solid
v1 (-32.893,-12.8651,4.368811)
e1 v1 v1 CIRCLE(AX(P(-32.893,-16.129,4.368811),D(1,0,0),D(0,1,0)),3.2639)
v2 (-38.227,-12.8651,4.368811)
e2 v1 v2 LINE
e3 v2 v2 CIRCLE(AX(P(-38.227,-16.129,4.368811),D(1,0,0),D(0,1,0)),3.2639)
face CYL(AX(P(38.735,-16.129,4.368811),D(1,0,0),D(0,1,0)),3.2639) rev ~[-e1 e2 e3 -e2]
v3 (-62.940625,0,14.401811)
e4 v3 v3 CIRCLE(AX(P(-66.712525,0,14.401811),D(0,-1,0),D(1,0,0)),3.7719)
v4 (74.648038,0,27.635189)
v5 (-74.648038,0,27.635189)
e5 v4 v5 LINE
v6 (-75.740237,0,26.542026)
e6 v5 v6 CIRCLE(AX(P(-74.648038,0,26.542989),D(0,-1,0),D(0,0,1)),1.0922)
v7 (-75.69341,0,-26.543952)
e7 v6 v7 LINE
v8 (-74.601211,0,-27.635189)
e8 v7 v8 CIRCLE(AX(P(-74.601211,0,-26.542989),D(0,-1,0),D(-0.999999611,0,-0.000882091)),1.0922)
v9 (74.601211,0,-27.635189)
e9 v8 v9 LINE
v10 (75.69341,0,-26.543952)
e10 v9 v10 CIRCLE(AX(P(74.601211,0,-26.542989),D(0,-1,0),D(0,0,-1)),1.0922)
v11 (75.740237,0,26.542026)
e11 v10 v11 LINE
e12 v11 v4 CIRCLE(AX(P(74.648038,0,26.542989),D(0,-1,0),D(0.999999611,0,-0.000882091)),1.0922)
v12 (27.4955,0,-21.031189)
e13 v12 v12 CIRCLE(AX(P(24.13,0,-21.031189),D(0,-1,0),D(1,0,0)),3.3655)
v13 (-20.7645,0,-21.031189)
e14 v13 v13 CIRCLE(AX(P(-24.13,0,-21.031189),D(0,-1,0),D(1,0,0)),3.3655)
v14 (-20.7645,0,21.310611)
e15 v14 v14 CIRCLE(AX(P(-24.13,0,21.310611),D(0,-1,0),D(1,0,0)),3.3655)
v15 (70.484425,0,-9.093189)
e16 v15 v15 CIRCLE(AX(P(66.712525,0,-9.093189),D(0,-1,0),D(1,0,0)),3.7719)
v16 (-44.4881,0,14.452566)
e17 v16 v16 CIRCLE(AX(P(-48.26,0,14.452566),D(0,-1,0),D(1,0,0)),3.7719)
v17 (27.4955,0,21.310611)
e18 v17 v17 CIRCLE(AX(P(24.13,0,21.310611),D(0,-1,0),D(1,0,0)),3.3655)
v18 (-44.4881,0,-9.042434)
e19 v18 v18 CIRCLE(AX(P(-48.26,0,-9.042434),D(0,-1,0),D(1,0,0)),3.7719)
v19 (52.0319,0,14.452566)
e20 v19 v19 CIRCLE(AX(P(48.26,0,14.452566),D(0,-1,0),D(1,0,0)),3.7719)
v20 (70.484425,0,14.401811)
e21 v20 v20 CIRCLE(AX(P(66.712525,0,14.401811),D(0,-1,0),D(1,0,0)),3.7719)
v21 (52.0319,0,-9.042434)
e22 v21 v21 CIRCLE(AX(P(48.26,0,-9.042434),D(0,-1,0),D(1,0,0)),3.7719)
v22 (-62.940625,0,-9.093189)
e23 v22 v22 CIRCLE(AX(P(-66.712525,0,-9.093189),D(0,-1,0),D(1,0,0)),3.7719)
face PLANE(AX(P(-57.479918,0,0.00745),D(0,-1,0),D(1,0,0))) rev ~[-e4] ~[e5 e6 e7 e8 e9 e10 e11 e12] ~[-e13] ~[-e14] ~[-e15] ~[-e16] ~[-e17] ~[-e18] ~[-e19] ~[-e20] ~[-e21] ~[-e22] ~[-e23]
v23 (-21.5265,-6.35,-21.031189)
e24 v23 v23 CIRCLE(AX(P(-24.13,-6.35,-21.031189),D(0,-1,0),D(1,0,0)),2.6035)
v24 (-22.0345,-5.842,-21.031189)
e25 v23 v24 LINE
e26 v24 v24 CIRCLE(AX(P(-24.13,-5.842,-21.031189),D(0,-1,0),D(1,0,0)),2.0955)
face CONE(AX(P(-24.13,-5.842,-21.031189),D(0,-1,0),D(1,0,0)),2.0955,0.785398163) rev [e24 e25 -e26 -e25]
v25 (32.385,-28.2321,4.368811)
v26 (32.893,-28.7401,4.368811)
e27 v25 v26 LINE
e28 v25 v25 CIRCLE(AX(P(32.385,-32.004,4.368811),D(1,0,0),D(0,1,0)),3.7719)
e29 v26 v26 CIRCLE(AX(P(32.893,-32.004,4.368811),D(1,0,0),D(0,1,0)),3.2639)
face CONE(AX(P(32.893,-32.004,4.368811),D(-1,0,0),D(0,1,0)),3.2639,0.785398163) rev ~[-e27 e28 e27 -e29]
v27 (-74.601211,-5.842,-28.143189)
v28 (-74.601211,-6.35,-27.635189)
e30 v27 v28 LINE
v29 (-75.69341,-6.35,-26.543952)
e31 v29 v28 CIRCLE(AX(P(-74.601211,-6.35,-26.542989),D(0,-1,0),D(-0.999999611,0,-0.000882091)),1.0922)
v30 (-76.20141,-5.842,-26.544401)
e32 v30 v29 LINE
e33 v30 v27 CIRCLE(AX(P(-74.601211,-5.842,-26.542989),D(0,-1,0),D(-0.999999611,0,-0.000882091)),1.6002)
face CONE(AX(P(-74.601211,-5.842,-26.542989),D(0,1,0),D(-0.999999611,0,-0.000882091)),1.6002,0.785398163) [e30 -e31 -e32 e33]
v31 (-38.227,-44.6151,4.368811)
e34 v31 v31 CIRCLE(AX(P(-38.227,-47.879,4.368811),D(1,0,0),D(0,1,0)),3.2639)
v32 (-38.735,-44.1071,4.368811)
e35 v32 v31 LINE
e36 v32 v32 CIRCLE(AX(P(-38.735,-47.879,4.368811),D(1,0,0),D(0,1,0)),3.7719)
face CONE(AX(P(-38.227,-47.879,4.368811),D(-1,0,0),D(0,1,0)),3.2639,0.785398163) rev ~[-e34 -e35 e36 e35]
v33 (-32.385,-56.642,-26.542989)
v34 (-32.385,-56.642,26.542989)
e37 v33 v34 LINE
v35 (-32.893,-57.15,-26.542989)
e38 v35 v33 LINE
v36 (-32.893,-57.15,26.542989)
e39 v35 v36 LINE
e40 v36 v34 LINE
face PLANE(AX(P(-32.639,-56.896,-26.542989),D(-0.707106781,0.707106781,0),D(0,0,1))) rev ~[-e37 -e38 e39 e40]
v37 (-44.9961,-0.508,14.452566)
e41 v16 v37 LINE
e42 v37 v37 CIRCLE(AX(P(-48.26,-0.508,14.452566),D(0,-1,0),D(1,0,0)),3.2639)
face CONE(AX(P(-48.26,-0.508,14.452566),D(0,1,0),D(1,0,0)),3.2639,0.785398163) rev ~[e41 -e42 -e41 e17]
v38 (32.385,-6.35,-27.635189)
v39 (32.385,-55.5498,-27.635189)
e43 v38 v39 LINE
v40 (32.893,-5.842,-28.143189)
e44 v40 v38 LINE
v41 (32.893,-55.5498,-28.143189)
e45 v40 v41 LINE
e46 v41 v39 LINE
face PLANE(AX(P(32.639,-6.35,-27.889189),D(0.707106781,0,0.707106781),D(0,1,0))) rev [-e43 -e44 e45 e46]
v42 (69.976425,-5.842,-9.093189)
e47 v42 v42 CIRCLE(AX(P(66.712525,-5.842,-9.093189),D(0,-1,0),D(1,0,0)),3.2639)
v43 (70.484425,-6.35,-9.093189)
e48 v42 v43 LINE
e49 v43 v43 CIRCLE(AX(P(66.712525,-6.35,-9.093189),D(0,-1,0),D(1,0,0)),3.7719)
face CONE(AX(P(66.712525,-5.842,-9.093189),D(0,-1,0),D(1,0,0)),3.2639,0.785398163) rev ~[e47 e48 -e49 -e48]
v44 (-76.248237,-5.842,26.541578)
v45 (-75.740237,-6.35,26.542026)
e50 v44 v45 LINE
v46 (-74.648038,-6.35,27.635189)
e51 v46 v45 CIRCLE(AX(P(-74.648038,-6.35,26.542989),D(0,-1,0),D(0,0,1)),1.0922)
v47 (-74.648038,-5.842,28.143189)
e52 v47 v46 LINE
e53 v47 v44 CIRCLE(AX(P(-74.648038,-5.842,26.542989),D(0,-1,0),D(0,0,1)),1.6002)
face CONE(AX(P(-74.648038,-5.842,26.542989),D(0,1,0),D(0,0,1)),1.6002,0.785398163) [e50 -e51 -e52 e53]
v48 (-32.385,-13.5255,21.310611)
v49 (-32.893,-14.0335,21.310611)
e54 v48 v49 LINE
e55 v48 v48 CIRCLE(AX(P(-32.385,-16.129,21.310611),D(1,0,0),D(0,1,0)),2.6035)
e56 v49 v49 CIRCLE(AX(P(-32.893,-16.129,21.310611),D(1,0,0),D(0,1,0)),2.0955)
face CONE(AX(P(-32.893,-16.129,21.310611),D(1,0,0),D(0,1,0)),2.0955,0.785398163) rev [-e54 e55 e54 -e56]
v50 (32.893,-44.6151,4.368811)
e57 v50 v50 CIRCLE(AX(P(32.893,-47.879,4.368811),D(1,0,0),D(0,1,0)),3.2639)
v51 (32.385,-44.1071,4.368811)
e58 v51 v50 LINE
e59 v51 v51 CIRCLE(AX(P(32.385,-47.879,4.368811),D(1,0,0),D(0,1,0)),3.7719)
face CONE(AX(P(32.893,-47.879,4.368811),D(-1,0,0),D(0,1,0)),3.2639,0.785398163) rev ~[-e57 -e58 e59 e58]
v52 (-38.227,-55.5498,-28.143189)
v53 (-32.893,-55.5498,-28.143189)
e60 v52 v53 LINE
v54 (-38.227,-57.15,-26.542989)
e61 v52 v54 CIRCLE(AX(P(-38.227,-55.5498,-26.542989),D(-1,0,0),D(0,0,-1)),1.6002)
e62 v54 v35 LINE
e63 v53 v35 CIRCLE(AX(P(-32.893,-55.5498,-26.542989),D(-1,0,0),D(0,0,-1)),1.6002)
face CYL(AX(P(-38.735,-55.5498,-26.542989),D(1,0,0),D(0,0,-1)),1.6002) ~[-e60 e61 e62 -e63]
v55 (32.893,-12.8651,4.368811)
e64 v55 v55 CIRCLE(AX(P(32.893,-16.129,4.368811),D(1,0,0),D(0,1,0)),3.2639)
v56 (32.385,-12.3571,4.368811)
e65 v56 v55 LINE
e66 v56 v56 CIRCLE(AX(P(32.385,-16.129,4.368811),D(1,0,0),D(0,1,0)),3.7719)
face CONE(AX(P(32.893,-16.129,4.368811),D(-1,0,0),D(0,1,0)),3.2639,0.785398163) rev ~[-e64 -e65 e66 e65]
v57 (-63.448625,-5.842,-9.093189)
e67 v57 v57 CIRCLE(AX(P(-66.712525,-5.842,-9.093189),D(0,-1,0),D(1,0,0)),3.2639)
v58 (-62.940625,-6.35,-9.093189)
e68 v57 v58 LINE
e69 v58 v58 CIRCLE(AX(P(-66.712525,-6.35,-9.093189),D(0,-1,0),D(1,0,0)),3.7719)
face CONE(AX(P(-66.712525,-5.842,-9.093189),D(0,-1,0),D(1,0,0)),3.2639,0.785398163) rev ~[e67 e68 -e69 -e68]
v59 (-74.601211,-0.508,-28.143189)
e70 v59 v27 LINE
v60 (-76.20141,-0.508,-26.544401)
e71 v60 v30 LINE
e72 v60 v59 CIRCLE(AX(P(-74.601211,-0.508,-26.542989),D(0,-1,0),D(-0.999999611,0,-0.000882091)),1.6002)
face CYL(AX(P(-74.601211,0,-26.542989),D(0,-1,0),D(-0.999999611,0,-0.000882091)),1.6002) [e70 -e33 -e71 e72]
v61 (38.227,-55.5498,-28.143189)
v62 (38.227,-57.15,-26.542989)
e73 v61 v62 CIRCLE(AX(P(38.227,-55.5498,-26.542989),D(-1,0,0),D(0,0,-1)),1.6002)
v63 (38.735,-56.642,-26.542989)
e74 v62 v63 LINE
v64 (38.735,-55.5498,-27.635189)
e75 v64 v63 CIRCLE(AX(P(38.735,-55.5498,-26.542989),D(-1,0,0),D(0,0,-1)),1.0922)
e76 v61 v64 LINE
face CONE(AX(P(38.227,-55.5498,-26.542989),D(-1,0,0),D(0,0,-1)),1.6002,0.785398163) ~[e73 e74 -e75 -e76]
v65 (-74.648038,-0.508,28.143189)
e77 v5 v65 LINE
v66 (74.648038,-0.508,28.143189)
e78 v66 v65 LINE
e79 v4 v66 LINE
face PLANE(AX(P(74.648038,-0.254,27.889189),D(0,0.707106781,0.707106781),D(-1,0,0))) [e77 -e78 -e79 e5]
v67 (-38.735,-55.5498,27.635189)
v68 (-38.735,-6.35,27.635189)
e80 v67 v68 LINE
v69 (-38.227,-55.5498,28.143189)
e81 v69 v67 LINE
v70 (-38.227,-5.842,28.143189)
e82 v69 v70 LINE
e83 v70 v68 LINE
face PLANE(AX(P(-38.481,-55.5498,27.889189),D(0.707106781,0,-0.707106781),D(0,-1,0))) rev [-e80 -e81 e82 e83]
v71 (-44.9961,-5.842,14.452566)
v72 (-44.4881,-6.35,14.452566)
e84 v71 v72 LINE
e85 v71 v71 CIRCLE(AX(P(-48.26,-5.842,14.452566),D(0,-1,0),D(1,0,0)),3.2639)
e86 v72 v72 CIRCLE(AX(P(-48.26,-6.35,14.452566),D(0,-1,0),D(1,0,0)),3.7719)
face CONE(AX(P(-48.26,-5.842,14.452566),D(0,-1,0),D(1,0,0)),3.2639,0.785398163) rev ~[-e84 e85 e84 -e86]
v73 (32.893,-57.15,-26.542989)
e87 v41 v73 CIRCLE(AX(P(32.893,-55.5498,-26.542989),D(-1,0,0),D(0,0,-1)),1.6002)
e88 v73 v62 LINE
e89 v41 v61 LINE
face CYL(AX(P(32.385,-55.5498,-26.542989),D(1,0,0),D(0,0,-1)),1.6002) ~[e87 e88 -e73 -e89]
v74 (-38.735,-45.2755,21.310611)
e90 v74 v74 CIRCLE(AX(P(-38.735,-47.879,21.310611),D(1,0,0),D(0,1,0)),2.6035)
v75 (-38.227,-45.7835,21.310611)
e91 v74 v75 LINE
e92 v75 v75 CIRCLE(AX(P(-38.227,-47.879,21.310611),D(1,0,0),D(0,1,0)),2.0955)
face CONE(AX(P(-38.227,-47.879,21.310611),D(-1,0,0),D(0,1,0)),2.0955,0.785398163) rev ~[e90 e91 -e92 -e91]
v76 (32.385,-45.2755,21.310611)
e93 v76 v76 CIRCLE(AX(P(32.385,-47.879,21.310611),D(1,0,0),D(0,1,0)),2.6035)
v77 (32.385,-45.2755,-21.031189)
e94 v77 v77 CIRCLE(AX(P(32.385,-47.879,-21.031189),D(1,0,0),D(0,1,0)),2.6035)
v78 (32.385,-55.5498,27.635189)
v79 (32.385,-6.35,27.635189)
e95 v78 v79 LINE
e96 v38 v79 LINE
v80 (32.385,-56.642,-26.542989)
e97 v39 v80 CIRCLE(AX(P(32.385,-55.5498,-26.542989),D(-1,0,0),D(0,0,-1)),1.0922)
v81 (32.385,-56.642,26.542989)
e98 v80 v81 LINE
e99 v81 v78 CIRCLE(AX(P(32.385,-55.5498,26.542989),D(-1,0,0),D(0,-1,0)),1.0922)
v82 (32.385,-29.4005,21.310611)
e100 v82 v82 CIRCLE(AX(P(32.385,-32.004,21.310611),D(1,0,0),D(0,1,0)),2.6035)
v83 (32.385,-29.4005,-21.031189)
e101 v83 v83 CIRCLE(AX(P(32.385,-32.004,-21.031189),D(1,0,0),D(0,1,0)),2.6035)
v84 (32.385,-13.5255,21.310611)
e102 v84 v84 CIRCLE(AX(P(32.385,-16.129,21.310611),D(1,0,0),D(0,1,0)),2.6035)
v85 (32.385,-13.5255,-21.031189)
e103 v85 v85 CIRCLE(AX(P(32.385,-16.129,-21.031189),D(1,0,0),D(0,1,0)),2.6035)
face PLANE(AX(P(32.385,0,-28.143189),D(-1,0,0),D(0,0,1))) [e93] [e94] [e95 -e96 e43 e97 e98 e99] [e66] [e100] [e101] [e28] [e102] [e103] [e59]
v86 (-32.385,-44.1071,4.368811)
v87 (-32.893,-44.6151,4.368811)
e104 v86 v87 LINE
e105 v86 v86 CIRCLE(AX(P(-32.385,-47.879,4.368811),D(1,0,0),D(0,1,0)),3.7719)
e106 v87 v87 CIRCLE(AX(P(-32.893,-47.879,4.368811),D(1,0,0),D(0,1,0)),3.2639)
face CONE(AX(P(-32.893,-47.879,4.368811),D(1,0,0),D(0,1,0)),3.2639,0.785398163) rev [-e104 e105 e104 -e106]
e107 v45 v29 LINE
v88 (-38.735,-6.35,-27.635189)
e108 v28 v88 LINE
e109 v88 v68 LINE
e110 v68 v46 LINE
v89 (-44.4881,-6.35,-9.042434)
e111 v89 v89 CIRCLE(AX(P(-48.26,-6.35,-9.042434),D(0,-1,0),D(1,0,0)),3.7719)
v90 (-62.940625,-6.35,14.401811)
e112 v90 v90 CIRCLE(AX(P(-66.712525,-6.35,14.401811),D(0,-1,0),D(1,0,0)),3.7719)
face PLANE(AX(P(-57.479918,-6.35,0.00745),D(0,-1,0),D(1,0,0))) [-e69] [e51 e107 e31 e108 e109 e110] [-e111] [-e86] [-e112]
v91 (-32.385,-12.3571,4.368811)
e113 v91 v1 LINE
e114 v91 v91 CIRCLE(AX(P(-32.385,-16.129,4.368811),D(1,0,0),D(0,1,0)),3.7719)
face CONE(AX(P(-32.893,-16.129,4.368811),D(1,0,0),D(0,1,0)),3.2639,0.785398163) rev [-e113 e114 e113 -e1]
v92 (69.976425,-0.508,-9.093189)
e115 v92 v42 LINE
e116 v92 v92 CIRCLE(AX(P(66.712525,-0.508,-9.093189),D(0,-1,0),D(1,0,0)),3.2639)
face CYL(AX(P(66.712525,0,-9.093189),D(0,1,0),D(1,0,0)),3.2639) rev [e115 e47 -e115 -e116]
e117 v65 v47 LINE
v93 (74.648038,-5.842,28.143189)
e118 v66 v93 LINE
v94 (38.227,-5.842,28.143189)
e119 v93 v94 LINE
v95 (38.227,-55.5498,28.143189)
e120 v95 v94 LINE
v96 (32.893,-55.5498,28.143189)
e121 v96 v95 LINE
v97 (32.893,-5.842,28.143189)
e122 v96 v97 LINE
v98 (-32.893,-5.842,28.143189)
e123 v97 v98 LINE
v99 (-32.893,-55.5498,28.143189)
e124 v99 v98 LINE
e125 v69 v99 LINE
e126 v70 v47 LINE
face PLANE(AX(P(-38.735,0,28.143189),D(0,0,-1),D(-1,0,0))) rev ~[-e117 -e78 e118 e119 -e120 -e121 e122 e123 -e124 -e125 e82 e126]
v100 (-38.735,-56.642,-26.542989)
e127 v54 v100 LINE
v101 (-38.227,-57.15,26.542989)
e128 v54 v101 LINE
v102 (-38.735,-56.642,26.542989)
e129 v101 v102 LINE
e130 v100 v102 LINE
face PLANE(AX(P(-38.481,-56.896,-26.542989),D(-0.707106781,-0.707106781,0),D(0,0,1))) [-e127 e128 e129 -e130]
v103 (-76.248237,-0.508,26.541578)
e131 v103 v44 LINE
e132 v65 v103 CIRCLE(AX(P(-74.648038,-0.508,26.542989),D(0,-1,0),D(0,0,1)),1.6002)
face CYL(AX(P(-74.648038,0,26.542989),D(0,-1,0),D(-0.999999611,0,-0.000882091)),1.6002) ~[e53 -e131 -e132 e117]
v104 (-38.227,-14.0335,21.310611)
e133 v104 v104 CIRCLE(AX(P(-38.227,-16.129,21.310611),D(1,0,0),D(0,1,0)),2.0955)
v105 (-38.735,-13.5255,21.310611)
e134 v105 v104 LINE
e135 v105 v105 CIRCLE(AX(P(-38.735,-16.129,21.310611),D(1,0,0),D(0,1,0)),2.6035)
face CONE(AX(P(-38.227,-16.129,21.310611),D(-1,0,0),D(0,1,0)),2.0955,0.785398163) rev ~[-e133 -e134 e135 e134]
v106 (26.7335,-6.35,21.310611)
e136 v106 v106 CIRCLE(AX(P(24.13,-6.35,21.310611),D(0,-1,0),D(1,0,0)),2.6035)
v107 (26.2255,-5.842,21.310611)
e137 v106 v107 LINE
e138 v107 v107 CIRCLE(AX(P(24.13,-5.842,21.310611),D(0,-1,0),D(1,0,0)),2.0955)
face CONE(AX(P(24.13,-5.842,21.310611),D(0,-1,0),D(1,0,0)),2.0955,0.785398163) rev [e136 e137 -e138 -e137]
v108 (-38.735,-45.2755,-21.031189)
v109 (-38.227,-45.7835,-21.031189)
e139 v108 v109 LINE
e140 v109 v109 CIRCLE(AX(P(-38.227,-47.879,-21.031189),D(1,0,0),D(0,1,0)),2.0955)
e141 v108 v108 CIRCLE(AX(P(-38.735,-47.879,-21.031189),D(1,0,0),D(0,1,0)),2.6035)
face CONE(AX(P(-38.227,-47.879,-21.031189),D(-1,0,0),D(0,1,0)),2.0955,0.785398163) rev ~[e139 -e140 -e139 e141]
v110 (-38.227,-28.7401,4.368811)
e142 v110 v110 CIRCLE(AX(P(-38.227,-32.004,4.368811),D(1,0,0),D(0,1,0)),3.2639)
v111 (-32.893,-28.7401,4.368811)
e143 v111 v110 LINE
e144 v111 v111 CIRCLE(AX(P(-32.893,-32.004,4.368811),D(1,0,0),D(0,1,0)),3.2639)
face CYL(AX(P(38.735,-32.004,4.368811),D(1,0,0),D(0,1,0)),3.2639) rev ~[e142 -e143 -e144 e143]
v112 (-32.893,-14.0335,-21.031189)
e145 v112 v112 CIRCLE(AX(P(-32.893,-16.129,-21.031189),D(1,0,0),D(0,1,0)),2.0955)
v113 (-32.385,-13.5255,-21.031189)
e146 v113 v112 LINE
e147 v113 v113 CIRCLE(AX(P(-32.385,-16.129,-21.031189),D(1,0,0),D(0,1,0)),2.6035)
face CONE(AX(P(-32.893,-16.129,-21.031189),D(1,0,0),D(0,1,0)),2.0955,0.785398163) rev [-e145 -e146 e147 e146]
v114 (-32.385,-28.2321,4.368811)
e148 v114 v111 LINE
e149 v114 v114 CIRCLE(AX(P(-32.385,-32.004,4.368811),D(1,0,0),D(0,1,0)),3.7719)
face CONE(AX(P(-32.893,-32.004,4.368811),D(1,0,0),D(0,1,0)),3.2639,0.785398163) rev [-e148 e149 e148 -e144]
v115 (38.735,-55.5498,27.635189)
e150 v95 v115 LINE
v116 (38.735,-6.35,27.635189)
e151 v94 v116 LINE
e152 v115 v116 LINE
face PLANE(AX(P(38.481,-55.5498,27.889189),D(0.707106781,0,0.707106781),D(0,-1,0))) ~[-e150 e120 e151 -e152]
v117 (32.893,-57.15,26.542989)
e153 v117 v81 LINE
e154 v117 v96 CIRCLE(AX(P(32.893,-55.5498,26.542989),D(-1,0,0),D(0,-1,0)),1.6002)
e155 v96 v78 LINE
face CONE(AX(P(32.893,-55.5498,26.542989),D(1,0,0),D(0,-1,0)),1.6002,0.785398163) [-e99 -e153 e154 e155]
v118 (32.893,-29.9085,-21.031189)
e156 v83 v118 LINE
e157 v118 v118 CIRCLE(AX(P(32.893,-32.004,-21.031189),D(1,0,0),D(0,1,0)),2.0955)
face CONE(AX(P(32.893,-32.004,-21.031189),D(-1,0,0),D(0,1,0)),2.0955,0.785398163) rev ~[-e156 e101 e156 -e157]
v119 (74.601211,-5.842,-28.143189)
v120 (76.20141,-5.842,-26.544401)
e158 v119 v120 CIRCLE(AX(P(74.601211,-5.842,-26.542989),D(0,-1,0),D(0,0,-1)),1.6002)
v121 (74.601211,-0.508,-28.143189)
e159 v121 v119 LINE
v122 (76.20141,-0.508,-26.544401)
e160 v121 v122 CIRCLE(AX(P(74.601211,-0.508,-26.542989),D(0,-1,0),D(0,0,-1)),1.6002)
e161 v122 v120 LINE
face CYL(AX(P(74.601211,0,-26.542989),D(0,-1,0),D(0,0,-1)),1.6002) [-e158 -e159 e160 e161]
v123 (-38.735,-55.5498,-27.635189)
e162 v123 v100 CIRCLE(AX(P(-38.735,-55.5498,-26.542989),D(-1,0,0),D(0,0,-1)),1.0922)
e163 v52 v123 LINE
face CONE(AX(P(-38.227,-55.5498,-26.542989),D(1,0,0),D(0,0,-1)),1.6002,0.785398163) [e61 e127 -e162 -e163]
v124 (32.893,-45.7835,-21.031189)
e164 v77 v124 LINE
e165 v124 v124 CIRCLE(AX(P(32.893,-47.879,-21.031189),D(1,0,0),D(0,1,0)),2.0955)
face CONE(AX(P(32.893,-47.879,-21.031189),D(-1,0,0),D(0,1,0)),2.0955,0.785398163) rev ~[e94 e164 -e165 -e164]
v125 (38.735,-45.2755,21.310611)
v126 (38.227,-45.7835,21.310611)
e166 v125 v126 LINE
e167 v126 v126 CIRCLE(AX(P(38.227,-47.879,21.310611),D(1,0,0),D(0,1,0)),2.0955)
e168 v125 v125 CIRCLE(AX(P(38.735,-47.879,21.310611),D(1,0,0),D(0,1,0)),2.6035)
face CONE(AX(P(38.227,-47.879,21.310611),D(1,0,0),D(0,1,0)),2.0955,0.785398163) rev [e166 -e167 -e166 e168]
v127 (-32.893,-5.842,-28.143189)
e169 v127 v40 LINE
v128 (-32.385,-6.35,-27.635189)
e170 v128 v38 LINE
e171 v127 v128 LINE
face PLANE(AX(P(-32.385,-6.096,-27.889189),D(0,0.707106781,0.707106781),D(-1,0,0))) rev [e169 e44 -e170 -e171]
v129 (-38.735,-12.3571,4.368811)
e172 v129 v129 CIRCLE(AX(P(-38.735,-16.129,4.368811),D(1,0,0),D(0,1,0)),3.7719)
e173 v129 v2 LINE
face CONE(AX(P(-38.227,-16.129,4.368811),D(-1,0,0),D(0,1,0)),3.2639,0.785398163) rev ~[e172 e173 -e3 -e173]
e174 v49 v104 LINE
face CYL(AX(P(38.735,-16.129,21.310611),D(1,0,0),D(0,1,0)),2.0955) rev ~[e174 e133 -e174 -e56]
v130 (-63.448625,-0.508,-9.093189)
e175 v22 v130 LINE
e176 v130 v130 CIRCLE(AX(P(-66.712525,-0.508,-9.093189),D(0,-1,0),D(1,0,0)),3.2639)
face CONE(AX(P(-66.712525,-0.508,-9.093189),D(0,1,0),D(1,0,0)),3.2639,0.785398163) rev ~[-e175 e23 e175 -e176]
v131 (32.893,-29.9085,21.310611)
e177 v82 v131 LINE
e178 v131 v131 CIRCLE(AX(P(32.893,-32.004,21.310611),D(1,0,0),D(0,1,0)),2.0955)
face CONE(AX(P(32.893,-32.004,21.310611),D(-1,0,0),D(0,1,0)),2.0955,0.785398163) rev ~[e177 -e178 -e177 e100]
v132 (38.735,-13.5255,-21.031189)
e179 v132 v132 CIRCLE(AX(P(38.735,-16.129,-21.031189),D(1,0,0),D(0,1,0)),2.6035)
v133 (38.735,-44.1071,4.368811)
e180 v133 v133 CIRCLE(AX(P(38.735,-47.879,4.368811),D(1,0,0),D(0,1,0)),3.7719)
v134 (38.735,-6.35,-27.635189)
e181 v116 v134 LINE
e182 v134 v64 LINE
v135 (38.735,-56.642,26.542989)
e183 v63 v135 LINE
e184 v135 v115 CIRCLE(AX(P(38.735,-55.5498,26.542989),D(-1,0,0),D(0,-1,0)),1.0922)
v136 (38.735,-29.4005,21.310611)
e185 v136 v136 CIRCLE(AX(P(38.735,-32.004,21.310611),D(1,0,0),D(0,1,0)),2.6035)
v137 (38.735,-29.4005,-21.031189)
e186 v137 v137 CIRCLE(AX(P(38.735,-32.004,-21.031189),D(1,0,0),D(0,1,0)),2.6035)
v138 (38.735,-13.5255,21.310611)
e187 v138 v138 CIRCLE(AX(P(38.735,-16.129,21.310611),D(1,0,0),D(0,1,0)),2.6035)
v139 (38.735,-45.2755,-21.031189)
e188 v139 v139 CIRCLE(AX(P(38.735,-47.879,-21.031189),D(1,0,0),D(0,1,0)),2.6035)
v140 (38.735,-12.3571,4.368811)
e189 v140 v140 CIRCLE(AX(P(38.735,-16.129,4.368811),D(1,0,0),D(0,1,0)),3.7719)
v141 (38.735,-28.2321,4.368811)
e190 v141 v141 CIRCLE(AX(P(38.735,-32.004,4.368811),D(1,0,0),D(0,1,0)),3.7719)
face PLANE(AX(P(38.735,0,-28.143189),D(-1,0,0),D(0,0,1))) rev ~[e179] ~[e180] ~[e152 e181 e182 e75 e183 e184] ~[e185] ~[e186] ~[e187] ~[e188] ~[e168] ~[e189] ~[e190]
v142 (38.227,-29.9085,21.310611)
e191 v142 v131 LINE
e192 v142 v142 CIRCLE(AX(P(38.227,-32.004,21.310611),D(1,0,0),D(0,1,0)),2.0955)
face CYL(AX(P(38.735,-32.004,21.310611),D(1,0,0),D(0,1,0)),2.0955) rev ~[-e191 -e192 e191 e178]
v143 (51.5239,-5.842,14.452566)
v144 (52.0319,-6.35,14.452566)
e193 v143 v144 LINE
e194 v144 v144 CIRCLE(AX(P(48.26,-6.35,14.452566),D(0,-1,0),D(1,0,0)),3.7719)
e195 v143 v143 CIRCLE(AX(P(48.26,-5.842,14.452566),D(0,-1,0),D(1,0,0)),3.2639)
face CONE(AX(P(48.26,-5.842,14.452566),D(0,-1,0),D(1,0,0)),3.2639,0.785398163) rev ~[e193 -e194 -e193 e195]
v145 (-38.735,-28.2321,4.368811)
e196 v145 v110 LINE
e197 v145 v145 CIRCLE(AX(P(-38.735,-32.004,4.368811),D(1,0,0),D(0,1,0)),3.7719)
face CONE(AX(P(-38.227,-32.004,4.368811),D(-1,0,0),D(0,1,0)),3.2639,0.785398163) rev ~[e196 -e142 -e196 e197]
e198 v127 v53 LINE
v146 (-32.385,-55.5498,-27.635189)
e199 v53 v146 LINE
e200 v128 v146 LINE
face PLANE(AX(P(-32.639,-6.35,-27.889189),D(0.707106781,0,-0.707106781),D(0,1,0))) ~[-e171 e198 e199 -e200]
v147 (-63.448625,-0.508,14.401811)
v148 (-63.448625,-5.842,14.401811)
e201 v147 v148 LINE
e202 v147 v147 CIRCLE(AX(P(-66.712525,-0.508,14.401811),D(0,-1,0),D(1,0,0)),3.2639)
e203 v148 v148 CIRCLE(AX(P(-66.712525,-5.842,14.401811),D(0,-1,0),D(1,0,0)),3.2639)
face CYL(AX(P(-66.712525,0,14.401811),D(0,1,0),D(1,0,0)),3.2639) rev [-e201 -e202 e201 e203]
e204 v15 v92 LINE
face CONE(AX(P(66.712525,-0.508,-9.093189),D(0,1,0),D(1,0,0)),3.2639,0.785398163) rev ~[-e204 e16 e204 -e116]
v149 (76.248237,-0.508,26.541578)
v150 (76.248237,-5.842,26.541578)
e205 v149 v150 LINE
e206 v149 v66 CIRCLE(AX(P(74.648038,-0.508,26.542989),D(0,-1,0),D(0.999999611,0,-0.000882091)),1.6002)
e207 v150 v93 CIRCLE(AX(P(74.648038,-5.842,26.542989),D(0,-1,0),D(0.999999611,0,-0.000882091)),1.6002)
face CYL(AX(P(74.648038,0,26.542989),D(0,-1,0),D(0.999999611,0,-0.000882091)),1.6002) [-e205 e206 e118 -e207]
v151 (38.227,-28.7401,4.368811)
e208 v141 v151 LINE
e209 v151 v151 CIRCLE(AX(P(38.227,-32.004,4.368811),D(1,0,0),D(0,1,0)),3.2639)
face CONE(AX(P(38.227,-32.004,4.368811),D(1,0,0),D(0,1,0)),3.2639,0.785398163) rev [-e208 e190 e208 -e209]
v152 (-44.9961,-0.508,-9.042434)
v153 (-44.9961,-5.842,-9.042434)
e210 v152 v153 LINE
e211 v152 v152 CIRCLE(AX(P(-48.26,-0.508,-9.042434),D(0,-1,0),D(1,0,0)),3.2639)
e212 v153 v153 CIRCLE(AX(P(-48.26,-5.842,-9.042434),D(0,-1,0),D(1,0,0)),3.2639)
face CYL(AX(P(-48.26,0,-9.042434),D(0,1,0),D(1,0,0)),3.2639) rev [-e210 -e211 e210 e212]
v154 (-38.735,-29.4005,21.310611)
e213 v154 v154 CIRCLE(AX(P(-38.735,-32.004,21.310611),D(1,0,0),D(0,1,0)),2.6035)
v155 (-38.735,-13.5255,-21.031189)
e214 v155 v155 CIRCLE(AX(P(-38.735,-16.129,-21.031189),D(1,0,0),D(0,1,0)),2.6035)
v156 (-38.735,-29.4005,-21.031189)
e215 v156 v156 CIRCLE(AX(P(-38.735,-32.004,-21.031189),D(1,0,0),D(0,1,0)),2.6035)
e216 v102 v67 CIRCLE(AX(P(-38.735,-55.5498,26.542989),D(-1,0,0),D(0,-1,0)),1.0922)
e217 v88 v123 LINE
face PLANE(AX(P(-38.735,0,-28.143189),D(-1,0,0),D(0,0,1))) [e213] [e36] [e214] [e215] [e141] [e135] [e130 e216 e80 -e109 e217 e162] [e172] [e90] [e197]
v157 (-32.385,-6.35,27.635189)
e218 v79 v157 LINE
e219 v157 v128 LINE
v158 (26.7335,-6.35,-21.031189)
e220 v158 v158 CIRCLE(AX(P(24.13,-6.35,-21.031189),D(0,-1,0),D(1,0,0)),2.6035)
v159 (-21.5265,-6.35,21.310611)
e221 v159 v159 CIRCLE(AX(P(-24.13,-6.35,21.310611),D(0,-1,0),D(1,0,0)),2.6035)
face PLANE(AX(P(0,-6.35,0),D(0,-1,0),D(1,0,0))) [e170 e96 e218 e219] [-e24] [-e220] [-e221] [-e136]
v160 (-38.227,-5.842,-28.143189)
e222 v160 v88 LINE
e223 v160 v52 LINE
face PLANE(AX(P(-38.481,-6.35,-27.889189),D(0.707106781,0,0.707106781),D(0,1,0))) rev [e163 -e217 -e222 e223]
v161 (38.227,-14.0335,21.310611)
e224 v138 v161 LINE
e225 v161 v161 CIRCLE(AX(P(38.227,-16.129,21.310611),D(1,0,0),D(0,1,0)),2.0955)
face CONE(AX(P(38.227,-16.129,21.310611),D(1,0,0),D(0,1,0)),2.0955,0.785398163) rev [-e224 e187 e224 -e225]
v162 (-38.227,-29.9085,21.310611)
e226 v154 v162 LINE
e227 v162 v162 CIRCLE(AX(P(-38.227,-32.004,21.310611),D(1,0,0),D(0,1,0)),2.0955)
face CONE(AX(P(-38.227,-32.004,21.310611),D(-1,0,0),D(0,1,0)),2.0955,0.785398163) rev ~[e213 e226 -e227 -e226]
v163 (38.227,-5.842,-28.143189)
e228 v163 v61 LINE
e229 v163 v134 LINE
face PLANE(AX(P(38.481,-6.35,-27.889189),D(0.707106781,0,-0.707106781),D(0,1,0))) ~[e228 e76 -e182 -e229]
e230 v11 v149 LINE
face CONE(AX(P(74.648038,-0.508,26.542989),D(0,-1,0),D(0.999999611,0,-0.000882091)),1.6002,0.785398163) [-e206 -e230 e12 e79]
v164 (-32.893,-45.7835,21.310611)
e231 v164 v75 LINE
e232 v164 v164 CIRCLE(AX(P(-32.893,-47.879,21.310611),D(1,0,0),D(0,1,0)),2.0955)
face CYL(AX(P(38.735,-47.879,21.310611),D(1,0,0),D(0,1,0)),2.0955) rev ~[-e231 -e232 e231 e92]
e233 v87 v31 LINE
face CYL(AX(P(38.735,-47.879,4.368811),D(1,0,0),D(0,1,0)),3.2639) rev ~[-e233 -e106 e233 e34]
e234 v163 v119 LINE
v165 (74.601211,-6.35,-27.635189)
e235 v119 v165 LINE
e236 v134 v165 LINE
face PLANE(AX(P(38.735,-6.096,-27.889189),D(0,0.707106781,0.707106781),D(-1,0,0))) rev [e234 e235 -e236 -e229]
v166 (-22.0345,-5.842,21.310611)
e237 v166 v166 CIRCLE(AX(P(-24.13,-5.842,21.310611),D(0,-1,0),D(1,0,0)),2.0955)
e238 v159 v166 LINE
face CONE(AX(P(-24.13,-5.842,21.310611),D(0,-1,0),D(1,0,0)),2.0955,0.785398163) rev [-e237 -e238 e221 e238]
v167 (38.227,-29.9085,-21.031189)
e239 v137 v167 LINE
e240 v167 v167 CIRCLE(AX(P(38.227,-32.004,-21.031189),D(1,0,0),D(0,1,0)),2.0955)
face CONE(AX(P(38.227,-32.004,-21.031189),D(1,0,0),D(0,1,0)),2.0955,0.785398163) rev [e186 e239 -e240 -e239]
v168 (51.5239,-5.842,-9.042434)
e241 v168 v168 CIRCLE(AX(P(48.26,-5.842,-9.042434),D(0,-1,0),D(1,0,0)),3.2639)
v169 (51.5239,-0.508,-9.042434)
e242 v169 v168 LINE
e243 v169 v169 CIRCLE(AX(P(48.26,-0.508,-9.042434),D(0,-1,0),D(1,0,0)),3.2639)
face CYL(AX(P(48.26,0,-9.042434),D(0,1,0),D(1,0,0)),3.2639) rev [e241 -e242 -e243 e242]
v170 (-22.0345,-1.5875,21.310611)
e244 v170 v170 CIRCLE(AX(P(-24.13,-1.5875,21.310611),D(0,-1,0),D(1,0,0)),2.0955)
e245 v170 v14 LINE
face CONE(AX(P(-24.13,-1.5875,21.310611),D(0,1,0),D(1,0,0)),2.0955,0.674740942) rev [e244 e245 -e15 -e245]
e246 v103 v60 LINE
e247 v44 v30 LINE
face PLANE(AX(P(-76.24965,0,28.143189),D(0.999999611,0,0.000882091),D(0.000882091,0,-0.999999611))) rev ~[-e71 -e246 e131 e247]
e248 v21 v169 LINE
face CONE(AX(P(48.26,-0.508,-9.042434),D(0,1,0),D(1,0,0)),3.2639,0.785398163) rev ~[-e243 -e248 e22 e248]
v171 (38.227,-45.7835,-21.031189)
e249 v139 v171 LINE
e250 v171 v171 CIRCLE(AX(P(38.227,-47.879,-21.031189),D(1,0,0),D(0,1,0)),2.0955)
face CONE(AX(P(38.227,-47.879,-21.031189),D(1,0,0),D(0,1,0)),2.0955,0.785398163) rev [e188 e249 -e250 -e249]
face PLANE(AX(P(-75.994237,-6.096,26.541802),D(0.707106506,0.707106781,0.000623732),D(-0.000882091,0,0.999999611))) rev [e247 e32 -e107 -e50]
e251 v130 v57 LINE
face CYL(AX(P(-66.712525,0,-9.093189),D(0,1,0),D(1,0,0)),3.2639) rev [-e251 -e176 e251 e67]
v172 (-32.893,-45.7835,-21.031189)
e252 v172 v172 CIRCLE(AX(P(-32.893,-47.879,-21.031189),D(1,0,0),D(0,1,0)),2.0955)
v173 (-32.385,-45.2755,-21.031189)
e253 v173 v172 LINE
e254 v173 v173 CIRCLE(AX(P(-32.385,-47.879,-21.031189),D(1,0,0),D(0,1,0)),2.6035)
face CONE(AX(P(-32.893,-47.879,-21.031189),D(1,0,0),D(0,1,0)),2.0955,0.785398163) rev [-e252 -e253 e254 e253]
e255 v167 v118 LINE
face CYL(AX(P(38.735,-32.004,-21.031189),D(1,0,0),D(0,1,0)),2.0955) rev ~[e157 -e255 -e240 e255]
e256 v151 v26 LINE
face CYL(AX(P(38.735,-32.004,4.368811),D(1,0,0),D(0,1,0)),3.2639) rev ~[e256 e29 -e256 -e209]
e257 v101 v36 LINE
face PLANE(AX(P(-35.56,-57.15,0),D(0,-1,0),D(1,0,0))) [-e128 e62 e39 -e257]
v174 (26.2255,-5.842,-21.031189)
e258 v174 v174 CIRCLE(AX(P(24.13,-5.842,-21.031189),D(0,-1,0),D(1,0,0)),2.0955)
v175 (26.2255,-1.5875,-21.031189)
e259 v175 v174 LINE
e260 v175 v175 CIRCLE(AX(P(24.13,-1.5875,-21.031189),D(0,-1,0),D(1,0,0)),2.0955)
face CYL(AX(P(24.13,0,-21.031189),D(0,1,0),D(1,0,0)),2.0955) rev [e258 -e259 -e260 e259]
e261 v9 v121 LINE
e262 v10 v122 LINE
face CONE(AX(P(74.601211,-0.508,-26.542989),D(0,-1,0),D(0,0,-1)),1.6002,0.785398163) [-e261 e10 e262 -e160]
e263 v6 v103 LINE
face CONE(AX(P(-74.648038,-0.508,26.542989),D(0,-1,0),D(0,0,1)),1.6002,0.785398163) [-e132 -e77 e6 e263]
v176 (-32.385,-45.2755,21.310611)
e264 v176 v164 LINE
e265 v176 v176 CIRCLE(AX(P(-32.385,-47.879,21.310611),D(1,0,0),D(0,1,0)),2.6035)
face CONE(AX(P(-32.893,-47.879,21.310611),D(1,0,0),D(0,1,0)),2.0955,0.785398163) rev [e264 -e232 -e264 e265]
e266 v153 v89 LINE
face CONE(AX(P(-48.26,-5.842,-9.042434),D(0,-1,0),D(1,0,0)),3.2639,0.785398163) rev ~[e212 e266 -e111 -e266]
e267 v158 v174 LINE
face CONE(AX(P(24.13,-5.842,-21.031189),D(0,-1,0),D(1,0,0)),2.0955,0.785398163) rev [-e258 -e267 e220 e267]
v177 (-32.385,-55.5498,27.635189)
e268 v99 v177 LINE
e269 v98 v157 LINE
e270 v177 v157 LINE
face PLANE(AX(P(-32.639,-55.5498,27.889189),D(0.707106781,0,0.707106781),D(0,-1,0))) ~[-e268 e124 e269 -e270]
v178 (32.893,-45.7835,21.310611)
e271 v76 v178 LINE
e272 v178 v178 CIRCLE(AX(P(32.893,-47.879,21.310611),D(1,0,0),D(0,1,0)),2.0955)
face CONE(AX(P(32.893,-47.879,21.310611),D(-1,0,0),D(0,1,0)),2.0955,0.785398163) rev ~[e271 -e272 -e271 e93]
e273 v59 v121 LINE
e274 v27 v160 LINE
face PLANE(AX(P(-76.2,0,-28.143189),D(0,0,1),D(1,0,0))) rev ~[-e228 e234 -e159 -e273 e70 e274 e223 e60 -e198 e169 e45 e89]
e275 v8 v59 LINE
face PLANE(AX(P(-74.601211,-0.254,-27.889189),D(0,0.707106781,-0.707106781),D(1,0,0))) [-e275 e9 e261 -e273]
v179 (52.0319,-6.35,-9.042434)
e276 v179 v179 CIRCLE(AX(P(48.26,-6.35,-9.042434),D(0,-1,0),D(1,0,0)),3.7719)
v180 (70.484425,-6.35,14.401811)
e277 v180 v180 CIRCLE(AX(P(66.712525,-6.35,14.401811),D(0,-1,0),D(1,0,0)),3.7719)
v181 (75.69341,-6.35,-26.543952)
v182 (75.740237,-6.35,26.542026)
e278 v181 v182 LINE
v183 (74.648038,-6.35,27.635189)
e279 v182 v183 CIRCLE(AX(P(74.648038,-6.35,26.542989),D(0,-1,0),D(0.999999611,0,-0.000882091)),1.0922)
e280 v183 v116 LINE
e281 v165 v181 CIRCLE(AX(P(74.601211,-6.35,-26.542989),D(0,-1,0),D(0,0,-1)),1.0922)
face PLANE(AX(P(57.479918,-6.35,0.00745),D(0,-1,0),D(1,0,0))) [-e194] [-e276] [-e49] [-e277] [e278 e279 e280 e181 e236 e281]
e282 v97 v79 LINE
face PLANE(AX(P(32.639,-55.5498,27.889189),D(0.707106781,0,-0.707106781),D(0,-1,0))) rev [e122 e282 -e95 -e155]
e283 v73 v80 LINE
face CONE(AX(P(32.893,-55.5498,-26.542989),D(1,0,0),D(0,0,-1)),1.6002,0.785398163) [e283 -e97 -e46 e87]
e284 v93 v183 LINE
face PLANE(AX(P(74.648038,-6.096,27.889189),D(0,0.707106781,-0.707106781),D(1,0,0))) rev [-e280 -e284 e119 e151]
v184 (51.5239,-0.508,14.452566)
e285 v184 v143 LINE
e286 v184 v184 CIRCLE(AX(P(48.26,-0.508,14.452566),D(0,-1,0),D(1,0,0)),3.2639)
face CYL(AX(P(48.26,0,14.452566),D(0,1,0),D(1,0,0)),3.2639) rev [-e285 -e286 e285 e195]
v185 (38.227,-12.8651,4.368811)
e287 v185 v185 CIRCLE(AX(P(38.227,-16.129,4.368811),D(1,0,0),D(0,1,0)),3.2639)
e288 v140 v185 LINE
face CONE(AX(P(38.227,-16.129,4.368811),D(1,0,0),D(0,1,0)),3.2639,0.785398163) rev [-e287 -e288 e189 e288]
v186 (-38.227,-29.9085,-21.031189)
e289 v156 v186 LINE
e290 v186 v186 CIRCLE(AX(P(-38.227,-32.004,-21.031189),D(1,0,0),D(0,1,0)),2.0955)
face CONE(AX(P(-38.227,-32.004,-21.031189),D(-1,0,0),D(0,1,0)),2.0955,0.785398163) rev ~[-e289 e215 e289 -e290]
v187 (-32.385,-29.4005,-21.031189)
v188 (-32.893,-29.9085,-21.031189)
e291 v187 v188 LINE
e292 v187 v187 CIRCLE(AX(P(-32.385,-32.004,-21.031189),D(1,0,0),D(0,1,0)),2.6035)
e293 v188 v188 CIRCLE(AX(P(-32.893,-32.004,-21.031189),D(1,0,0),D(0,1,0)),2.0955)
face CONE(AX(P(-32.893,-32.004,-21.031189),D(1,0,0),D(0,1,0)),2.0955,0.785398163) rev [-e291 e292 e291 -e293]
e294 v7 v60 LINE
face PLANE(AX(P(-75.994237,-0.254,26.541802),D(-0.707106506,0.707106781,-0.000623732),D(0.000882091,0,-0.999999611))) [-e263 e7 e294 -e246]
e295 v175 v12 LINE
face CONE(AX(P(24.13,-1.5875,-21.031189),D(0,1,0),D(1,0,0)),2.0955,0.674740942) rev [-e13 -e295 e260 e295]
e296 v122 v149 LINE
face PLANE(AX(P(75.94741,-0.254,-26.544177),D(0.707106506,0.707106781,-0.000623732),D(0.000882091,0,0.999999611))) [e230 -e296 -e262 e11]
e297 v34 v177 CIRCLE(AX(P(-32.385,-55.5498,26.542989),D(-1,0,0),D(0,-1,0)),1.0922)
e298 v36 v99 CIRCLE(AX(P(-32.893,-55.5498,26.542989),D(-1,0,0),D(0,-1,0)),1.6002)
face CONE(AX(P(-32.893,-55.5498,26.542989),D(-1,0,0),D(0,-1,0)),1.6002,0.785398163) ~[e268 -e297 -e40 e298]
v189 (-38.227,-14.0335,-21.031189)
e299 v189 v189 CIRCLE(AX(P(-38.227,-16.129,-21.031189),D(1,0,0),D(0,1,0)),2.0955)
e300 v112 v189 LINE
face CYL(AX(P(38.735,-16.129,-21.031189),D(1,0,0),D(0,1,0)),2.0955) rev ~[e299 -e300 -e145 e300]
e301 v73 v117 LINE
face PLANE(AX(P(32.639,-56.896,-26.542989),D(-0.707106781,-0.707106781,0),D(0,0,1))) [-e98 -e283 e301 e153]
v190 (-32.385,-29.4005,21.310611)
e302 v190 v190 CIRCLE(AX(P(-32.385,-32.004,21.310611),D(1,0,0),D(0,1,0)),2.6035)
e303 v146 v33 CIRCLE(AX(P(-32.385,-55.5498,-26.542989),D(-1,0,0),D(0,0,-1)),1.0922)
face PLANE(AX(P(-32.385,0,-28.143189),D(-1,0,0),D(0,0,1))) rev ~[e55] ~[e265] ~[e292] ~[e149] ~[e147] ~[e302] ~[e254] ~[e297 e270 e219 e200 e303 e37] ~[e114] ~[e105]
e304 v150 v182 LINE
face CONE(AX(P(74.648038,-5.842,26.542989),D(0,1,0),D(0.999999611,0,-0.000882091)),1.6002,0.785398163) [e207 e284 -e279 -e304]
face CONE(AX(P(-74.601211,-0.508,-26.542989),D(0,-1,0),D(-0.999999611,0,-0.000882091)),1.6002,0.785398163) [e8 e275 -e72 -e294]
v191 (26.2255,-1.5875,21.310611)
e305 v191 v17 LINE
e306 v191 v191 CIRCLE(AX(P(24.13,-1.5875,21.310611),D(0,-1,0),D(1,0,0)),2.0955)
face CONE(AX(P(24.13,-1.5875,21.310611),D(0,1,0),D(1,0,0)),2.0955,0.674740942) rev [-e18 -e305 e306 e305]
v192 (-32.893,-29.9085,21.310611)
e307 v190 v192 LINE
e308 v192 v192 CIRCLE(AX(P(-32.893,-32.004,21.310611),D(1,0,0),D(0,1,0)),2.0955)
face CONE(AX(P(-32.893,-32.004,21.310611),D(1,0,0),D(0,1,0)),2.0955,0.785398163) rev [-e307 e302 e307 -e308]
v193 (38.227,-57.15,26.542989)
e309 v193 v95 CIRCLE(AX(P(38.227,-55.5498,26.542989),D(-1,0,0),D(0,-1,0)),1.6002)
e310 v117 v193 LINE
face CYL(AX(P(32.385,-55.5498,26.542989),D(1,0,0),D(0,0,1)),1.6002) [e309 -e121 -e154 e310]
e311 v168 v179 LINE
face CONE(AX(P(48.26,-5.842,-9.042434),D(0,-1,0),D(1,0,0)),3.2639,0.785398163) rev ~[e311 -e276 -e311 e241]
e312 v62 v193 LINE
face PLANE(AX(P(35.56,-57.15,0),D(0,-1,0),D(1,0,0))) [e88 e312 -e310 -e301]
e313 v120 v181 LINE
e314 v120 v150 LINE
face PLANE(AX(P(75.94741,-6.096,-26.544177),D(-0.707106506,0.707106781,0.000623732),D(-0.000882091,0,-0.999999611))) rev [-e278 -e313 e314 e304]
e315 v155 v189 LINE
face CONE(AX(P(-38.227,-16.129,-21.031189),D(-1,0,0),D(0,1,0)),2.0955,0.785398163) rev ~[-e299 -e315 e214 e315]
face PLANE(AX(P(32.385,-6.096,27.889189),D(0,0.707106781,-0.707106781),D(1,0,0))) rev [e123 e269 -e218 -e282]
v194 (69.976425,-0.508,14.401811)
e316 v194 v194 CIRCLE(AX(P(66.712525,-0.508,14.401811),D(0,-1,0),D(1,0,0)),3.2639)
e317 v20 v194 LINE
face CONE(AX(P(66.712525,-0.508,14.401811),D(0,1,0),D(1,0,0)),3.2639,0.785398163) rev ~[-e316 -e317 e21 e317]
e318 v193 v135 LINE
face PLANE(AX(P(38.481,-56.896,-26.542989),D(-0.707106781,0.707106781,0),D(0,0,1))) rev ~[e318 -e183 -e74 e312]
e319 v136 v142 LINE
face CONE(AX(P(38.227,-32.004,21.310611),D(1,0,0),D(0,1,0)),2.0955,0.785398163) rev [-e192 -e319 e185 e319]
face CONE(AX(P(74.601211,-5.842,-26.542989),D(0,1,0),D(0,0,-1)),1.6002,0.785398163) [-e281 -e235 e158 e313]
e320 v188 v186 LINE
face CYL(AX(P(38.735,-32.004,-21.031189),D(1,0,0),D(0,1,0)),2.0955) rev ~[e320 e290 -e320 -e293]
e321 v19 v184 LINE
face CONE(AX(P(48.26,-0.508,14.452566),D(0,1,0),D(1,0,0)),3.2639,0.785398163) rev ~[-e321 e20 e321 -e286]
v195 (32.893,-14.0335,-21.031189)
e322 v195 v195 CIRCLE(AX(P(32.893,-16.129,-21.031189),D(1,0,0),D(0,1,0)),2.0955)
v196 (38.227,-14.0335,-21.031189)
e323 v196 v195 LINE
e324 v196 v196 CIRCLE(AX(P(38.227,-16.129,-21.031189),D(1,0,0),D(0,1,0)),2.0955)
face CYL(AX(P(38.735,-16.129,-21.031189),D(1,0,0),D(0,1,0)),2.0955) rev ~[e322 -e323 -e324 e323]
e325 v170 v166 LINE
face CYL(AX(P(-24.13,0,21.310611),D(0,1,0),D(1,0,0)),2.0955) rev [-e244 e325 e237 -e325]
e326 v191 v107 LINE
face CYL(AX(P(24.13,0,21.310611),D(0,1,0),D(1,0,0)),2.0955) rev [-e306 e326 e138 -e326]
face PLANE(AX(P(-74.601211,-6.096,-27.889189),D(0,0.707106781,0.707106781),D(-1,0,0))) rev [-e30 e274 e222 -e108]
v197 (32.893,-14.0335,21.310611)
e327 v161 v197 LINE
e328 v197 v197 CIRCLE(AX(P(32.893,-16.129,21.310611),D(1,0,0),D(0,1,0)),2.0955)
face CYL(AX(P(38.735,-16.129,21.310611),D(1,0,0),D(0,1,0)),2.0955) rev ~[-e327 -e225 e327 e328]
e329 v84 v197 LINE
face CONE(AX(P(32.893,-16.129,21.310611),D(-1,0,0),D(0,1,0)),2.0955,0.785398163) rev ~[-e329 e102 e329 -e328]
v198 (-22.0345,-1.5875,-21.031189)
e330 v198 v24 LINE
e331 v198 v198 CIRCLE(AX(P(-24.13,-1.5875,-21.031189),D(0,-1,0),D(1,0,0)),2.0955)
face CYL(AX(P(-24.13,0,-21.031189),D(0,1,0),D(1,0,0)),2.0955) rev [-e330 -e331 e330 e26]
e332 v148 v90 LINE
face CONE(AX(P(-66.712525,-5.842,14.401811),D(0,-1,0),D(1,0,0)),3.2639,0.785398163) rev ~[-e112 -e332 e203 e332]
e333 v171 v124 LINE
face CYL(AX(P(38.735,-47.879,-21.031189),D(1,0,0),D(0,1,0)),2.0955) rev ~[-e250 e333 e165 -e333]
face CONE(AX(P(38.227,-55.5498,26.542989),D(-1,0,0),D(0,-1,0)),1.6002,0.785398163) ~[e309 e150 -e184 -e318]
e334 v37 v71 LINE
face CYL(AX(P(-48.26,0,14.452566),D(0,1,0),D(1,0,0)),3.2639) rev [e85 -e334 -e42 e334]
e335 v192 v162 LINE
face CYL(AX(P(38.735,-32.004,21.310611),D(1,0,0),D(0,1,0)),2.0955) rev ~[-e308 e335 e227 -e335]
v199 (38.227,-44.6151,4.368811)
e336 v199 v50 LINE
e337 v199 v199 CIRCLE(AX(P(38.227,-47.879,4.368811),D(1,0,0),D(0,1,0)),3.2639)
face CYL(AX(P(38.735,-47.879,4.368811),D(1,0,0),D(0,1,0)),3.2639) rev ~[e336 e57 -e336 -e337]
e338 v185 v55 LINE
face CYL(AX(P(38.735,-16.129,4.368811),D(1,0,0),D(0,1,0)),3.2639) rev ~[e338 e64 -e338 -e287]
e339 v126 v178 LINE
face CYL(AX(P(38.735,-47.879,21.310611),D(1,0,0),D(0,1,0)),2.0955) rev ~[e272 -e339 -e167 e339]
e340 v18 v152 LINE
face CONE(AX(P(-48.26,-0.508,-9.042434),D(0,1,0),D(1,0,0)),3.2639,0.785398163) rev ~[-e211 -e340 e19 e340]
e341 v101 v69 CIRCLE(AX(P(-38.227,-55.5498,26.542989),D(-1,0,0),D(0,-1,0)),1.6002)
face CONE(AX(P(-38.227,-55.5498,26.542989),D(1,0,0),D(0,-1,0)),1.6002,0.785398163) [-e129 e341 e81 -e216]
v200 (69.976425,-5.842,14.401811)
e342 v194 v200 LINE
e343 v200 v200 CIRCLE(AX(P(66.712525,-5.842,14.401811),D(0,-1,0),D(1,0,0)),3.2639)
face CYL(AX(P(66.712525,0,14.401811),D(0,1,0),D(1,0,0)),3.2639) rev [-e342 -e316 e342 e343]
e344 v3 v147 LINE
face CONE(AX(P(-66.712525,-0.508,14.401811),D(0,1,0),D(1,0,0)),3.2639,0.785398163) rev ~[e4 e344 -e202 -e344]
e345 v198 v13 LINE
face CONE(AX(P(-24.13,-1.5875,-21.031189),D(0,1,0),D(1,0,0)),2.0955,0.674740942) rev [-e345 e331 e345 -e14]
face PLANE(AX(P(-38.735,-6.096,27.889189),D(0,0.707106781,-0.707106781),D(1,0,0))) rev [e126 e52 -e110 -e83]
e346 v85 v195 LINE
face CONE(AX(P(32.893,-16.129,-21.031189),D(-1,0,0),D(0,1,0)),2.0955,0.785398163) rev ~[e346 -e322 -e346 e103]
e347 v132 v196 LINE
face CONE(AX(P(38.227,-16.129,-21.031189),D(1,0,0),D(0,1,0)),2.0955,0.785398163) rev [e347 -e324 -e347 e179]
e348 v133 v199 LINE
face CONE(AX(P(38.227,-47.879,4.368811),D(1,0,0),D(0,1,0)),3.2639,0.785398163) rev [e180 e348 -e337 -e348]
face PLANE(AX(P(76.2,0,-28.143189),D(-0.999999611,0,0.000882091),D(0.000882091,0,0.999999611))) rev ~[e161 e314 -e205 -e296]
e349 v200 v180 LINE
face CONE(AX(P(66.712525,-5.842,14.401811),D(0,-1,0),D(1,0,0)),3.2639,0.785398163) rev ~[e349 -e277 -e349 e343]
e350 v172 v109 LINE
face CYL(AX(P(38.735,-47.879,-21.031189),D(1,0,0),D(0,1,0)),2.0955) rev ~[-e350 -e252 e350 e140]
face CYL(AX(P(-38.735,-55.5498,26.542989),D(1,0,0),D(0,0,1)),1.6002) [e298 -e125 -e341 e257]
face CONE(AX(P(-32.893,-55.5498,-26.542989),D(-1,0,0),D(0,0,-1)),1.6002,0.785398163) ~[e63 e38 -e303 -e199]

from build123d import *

# Parameters (mm, degrees)
F0_W       = 6.35
F0_H       = 56.2863781022
F1_DEPTH   = 57.15
F0_R       = 3.2639
F0_R_2     = 2.0955
F2_DEPTH   = 6.35
F4_SIZE2   = 1.27
F4_SIZE    = 1.5875
F4_2_SIZE2 = 1.27
F4_2_SIZE  = 1.5875
F4_3_SIZE2 = 1.27
F4_3_SIZE  = 1.5875
F4_4_SIZE2 = 1.27
F4_4_SIZE  = 1.5875
F5_R       = 1.6002
F6_SIZE    = 0.508
F7_R       = 3.2639
F7_R_2     = 2.0955
F8_DEPTH   = 114.9842375546
F9_SIZE    = 0.508


# Not quite as in the source:
# - a feature names something its author has since deleted; it is built from what else it names


with BuildPart() as f1:
    # F0 (on Front) → F1 (new body)
    with BuildSketch(Plane.XZ):
        with Locations((-35.56, 0)):
            Rectangle(F0_W, F0_H)
    extrude(amount=F1_DEPTH)



with BuildPart() as f1b:
    # F0 (on Front) → F1, piece 2 (new body)
    with BuildSketch(Plane.XZ):
        with Locations((35.56, 0)):
            Rectangle(F0_W, F0_H)
    extrude(amount=F1_DEPTH)


with BuildPart() as f1_1:
    add(f1.part)

    add(f1b.part)  # F2 merges F1b
    # F0 (on Front) → F2 (join)
    with BuildSketch(Plane.XZ):
        Polygon((-76.249649699, 28.1431890511), (-76.2, -28.1431890511), (-38.735, -28.1431890511), (-38.735, 28.1431890511), align=None)
        with Locations((-66.7125248495, -9.0931890511)):
            Circle(F0_R, mode=Mode.SUBTRACT)
        with Locations((-48.26, -9.0424341398)):
            Circle(F0_R, mode=Mode.SUBTRACT)
        with Locations((-66.7125248495, 14.4018109489)):
            Circle(F0_R, mode=Mode.SUBTRACT)
        with Locations((-48.26, 14.4525658602)):
            Circle(F0_R, mode=Mode.SUBTRACT)
        Polygon((-32.385, 28.1431890511), (-32.385, -28.1431890511), (0, -28.1431890511), (32.385, -28.1431890511), (32.385, 28.1431890511), (0, 28.1431890511), align=None)
        with Locations((-24.13, -21.0311890511)):
            Circle(F0_R_2, mode=Mode.SUBTRACT)
        with Locations((24.13, -21.0311890511)):
            Circle(F0_R_2, mode=Mode.SUBTRACT)
        with Locations((-24.13, 21.3106109489)):
            Circle(F0_R_2, mode=Mode.SUBTRACT)
        with Locations((24.13, 21.3106109489)):
            Circle(F0_R_2, mode=Mode.SUBTRACT)
        Polygon((38.735, 28.1431890511), (38.735, -28.1431890511), (76.2, -28.1431890511), (76.249649699, 28.1431890511), align=None)
        with Locations((48.26, -9.0424341398)):
            Circle(F0_R, mode=Mode.SUBTRACT)
        with Locations((66.7125248495, -9.0931890511)):
            Circle(F0_R, mode=Mode.SUBTRACT)
        with Locations((48.26, 14.4525658602)):
            Circle(F0_R, mode=Mode.SUBTRACT)
        with Locations((66.7125248495, 14.4018109489)):
            Circle(F0_R, mode=Mode.SUBTRACT)
    extrude(amount=F2_DEPTH)

    # F3: union 

    # F4
    f4_edges = [f1_1.edges().sort_by_distance(p)[0] for p in [
        (22.0345, 0, 21.310611),
    ]]
    f4_side = f1_1.faces().sort_by_distance((22.0345, -3.175, 21.310611))[0]
    chamfer(f4_edges, length=F4_SIZE, length2=F4_SIZE2, reference=f4_side)

    # F4#2
    f4_2_edges = [f1_1.edges().sort_by_distance(p)[0] for p in [
        (-26.2255, 0, 21.310611),
    ]]
    f4_2_side = f1_1.faces().sort_by_distance((-26.2255, -3.175, 21.310611))[0]
    chamfer(f4_2_edges, length=F4_2_SIZE, length2=F4_2_SIZE2, reference=f4_2_side)

    # F4#3
    f4_3_edges = [f1_1.edges().sort_by_distance(p)[0] for p in [
        (22.0345, 0, -21.031189),
    ]]
    f4_3_side = f1_1.faces().sort_by_distance((22.0345, -3.175, -21.031189))[0]
    chamfer(f4_3_edges, length=F4_3_SIZE, length2=F4_3_SIZE2, reference=f4_3_side)

    # F4#4
    f4_4_edges = [f1_1.edges().sort_by_distance(p)[0] for p in [
        (-26.2255, 0, -21.031189),
    ]]
    f4_4_side = f1_1.faces().sort_by_distance((-26.2255, -3.175, -21.031189))[0]
    chamfer(f4_4_edges, length=F4_4_SIZE, length2=F4_4_SIZE2, reference=f4_4_side)

    # F5
    f5_edges = [f1_1.edges().sort_by_distance(p)[0] for p in [
        (76.24965, -3.175, 28.143189),
        (-76.24965, -3.175, 28.143189),
        (76.2, -3.175, -28.143189),
        (-76.2, -3.175, -28.143189),
        (-35.56, -57.15, 28.143189),
        (-35.56, -57.15, -28.143189),
        (35.56, -57.15, 28.143189),
        (35.56, -57.15, -28.143189),
    ]]
    fillet(f5_edges, radius=F5_R)

    # F6
    f6_edges = [f1_1.edges().sort_by_distance(p)[0] for p in [
        (63.448625, 0, 14.401811),
        (44.9961, 0, 14.452566),
        (63.448625, 0, -9.093189),
        (44.9961, 0, -9.042434),
        (-51.5239, 0, 14.452566),
        (-69.976425, 0, 14.401811),
        (-69.976425, 0, -9.093189),
        (-51.5239, 0, -9.042434),
        (76.224824, 0, -0.001412),
        (-56.691519, -6.35, 28.143189),
        (0, -6.35, 28.143189),
        (76.224824, -6.35, -0.001412),
        (0, -6.35, -28.143189),
        (32.385, -30.9499, -28.143189),
        (35.56, -55.5498, -28.143189),
        (38.735, -30.9499, -28.143189),
        (-32.385, -30.9499, -28.143189),
        (56.668105, -6.35, -28.143189),
        (-35.56, -55.5498, -28.143189),
        (74.601211, -3.175, -28.143189),
        (-38.735, -30.9499, -28.143189),
        (0, 0, -28.143189),
        (-56.668105, -6.35, -28.143189),
        (-74.601211, -3.175, -28.143189),
        (56.691519, -6.35, 28.143189),
        (-69.976425, -6.35, 14.401811),
        (-51.5239, -6.35, 14.452566),
        (-69.976425, -6.35, -9.093189),
        (-51.5239, -6.35, -9.042434),
        (-26.2255, -6.35, 21.310611),
        (22.0345, -6.35, 21.310611),
        (-26.2255, -6.35, -21.031189),
        (22.0345, -6.35, -21.031189),
        (44.9961, -6.35, 14.452566),
        (63.448625, -6.35, 14.401811),
        (44.9961, -6.35, -9.042434),
        (63.448625, -6.35, -9.093189),
    ]]
    chamfer(f6_edges, length=F6_SIZE)

    # F7 (on face) → F8 (cut, through all)
    with BuildSketch(Plane.YZ.offset(38.735)):
        with Locations((-47.879, 4.3688109489)):
            Circle(F7_R)
        with Locations((-16.129, 4.3688109489)):
            Circle(F7_R)
        with Locations((-47.879, 21.3106109489)):
            Circle(F7_R_2)
        with Locations((-16.129, 21.3106109489)):
            Circle(F7_R_2)
        with Locations((-32.004, 21.3106109489)):
            Circle(F7_R_2)
        with Locations((-47.879, -21.0311890511)):
            Circle(F7_R_2)
        with Locations((-32.004, -21.0311890511)):
            Circle(F7_R_2)
        with Locations((-16.129, -21.0311890511)):
            Circle(F7_R_2)
        with Locations((-32.004, 4.3688109489)):
            Circle(F7_R)
    extrude(amount=-F8_DEPTH, mode=Mode.SUBTRACT)

    # F9
    f9_edges = [f1_1.edges().sort_by_distance(p)[0] for p in [
        (38.735, -51.1429, 4.368811),
        (38.735, -19.3929, 4.368811),
        (32.385, -51.1429, 4.368811),
        (32.385, -19.3929, 4.368811),
        (-32.385, -51.1429, 4.368811),
        (-32.385, -19.3929, 4.368811),
        (-38.735, -51.1429, 4.368811),
        (-38.735, -19.3929, 4.368811),
        (38.735, -49.9745, 21.310611),
        (38.735, -34.0995, 21.310611),
        (38.735, -18.2245, 21.310611),
        (38.735, -49.9745, -21.031189),
        (38.735, -34.0995, -21.031189),
        (38.735, -18.2245, -21.031189),
        (38.735, -35.2679, 4.368811),
        (32.385, -49.9745, 21.310611),
        (32.385, -49.9745, -21.031189),
        (32.385, -34.0995, 21.310611),
        (32.385, -35.2679, 4.368811),
        (32.385, -18.2245, 21.310611),
        (32.385, -34.0995, -21.031189),
        (32.385, -18.2245, -21.031189),
        (-32.385, -49.9745, -21.031189),
        (-32.385, -49.9745, 21.310611),
        (-32.385, -34.0995, -21.031189),
        (-32.385, -18.2245, -21.031189),
        (-32.385, -35.2679, 4.368811),
        (-32.385, -34.0995, 21.310611),
        (-32.385, -18.2245, 21.310611),
        (-38.735, -49.9745, 21.310611),
        (-38.735, -49.9745, -21.031189),
        (-38.735, -34.0995, 21.310611),
        (-38.735, -35.2679, 4.368811),
        (-38.735, -18.2245, 21.310611),
        (-38.735, -34.0995, -21.031189),
        (-38.735, -18.2245, -21.031189),
    ]]
    chamfer(f9_edges, length=F9_SIZE)


solid = f1_1.part
